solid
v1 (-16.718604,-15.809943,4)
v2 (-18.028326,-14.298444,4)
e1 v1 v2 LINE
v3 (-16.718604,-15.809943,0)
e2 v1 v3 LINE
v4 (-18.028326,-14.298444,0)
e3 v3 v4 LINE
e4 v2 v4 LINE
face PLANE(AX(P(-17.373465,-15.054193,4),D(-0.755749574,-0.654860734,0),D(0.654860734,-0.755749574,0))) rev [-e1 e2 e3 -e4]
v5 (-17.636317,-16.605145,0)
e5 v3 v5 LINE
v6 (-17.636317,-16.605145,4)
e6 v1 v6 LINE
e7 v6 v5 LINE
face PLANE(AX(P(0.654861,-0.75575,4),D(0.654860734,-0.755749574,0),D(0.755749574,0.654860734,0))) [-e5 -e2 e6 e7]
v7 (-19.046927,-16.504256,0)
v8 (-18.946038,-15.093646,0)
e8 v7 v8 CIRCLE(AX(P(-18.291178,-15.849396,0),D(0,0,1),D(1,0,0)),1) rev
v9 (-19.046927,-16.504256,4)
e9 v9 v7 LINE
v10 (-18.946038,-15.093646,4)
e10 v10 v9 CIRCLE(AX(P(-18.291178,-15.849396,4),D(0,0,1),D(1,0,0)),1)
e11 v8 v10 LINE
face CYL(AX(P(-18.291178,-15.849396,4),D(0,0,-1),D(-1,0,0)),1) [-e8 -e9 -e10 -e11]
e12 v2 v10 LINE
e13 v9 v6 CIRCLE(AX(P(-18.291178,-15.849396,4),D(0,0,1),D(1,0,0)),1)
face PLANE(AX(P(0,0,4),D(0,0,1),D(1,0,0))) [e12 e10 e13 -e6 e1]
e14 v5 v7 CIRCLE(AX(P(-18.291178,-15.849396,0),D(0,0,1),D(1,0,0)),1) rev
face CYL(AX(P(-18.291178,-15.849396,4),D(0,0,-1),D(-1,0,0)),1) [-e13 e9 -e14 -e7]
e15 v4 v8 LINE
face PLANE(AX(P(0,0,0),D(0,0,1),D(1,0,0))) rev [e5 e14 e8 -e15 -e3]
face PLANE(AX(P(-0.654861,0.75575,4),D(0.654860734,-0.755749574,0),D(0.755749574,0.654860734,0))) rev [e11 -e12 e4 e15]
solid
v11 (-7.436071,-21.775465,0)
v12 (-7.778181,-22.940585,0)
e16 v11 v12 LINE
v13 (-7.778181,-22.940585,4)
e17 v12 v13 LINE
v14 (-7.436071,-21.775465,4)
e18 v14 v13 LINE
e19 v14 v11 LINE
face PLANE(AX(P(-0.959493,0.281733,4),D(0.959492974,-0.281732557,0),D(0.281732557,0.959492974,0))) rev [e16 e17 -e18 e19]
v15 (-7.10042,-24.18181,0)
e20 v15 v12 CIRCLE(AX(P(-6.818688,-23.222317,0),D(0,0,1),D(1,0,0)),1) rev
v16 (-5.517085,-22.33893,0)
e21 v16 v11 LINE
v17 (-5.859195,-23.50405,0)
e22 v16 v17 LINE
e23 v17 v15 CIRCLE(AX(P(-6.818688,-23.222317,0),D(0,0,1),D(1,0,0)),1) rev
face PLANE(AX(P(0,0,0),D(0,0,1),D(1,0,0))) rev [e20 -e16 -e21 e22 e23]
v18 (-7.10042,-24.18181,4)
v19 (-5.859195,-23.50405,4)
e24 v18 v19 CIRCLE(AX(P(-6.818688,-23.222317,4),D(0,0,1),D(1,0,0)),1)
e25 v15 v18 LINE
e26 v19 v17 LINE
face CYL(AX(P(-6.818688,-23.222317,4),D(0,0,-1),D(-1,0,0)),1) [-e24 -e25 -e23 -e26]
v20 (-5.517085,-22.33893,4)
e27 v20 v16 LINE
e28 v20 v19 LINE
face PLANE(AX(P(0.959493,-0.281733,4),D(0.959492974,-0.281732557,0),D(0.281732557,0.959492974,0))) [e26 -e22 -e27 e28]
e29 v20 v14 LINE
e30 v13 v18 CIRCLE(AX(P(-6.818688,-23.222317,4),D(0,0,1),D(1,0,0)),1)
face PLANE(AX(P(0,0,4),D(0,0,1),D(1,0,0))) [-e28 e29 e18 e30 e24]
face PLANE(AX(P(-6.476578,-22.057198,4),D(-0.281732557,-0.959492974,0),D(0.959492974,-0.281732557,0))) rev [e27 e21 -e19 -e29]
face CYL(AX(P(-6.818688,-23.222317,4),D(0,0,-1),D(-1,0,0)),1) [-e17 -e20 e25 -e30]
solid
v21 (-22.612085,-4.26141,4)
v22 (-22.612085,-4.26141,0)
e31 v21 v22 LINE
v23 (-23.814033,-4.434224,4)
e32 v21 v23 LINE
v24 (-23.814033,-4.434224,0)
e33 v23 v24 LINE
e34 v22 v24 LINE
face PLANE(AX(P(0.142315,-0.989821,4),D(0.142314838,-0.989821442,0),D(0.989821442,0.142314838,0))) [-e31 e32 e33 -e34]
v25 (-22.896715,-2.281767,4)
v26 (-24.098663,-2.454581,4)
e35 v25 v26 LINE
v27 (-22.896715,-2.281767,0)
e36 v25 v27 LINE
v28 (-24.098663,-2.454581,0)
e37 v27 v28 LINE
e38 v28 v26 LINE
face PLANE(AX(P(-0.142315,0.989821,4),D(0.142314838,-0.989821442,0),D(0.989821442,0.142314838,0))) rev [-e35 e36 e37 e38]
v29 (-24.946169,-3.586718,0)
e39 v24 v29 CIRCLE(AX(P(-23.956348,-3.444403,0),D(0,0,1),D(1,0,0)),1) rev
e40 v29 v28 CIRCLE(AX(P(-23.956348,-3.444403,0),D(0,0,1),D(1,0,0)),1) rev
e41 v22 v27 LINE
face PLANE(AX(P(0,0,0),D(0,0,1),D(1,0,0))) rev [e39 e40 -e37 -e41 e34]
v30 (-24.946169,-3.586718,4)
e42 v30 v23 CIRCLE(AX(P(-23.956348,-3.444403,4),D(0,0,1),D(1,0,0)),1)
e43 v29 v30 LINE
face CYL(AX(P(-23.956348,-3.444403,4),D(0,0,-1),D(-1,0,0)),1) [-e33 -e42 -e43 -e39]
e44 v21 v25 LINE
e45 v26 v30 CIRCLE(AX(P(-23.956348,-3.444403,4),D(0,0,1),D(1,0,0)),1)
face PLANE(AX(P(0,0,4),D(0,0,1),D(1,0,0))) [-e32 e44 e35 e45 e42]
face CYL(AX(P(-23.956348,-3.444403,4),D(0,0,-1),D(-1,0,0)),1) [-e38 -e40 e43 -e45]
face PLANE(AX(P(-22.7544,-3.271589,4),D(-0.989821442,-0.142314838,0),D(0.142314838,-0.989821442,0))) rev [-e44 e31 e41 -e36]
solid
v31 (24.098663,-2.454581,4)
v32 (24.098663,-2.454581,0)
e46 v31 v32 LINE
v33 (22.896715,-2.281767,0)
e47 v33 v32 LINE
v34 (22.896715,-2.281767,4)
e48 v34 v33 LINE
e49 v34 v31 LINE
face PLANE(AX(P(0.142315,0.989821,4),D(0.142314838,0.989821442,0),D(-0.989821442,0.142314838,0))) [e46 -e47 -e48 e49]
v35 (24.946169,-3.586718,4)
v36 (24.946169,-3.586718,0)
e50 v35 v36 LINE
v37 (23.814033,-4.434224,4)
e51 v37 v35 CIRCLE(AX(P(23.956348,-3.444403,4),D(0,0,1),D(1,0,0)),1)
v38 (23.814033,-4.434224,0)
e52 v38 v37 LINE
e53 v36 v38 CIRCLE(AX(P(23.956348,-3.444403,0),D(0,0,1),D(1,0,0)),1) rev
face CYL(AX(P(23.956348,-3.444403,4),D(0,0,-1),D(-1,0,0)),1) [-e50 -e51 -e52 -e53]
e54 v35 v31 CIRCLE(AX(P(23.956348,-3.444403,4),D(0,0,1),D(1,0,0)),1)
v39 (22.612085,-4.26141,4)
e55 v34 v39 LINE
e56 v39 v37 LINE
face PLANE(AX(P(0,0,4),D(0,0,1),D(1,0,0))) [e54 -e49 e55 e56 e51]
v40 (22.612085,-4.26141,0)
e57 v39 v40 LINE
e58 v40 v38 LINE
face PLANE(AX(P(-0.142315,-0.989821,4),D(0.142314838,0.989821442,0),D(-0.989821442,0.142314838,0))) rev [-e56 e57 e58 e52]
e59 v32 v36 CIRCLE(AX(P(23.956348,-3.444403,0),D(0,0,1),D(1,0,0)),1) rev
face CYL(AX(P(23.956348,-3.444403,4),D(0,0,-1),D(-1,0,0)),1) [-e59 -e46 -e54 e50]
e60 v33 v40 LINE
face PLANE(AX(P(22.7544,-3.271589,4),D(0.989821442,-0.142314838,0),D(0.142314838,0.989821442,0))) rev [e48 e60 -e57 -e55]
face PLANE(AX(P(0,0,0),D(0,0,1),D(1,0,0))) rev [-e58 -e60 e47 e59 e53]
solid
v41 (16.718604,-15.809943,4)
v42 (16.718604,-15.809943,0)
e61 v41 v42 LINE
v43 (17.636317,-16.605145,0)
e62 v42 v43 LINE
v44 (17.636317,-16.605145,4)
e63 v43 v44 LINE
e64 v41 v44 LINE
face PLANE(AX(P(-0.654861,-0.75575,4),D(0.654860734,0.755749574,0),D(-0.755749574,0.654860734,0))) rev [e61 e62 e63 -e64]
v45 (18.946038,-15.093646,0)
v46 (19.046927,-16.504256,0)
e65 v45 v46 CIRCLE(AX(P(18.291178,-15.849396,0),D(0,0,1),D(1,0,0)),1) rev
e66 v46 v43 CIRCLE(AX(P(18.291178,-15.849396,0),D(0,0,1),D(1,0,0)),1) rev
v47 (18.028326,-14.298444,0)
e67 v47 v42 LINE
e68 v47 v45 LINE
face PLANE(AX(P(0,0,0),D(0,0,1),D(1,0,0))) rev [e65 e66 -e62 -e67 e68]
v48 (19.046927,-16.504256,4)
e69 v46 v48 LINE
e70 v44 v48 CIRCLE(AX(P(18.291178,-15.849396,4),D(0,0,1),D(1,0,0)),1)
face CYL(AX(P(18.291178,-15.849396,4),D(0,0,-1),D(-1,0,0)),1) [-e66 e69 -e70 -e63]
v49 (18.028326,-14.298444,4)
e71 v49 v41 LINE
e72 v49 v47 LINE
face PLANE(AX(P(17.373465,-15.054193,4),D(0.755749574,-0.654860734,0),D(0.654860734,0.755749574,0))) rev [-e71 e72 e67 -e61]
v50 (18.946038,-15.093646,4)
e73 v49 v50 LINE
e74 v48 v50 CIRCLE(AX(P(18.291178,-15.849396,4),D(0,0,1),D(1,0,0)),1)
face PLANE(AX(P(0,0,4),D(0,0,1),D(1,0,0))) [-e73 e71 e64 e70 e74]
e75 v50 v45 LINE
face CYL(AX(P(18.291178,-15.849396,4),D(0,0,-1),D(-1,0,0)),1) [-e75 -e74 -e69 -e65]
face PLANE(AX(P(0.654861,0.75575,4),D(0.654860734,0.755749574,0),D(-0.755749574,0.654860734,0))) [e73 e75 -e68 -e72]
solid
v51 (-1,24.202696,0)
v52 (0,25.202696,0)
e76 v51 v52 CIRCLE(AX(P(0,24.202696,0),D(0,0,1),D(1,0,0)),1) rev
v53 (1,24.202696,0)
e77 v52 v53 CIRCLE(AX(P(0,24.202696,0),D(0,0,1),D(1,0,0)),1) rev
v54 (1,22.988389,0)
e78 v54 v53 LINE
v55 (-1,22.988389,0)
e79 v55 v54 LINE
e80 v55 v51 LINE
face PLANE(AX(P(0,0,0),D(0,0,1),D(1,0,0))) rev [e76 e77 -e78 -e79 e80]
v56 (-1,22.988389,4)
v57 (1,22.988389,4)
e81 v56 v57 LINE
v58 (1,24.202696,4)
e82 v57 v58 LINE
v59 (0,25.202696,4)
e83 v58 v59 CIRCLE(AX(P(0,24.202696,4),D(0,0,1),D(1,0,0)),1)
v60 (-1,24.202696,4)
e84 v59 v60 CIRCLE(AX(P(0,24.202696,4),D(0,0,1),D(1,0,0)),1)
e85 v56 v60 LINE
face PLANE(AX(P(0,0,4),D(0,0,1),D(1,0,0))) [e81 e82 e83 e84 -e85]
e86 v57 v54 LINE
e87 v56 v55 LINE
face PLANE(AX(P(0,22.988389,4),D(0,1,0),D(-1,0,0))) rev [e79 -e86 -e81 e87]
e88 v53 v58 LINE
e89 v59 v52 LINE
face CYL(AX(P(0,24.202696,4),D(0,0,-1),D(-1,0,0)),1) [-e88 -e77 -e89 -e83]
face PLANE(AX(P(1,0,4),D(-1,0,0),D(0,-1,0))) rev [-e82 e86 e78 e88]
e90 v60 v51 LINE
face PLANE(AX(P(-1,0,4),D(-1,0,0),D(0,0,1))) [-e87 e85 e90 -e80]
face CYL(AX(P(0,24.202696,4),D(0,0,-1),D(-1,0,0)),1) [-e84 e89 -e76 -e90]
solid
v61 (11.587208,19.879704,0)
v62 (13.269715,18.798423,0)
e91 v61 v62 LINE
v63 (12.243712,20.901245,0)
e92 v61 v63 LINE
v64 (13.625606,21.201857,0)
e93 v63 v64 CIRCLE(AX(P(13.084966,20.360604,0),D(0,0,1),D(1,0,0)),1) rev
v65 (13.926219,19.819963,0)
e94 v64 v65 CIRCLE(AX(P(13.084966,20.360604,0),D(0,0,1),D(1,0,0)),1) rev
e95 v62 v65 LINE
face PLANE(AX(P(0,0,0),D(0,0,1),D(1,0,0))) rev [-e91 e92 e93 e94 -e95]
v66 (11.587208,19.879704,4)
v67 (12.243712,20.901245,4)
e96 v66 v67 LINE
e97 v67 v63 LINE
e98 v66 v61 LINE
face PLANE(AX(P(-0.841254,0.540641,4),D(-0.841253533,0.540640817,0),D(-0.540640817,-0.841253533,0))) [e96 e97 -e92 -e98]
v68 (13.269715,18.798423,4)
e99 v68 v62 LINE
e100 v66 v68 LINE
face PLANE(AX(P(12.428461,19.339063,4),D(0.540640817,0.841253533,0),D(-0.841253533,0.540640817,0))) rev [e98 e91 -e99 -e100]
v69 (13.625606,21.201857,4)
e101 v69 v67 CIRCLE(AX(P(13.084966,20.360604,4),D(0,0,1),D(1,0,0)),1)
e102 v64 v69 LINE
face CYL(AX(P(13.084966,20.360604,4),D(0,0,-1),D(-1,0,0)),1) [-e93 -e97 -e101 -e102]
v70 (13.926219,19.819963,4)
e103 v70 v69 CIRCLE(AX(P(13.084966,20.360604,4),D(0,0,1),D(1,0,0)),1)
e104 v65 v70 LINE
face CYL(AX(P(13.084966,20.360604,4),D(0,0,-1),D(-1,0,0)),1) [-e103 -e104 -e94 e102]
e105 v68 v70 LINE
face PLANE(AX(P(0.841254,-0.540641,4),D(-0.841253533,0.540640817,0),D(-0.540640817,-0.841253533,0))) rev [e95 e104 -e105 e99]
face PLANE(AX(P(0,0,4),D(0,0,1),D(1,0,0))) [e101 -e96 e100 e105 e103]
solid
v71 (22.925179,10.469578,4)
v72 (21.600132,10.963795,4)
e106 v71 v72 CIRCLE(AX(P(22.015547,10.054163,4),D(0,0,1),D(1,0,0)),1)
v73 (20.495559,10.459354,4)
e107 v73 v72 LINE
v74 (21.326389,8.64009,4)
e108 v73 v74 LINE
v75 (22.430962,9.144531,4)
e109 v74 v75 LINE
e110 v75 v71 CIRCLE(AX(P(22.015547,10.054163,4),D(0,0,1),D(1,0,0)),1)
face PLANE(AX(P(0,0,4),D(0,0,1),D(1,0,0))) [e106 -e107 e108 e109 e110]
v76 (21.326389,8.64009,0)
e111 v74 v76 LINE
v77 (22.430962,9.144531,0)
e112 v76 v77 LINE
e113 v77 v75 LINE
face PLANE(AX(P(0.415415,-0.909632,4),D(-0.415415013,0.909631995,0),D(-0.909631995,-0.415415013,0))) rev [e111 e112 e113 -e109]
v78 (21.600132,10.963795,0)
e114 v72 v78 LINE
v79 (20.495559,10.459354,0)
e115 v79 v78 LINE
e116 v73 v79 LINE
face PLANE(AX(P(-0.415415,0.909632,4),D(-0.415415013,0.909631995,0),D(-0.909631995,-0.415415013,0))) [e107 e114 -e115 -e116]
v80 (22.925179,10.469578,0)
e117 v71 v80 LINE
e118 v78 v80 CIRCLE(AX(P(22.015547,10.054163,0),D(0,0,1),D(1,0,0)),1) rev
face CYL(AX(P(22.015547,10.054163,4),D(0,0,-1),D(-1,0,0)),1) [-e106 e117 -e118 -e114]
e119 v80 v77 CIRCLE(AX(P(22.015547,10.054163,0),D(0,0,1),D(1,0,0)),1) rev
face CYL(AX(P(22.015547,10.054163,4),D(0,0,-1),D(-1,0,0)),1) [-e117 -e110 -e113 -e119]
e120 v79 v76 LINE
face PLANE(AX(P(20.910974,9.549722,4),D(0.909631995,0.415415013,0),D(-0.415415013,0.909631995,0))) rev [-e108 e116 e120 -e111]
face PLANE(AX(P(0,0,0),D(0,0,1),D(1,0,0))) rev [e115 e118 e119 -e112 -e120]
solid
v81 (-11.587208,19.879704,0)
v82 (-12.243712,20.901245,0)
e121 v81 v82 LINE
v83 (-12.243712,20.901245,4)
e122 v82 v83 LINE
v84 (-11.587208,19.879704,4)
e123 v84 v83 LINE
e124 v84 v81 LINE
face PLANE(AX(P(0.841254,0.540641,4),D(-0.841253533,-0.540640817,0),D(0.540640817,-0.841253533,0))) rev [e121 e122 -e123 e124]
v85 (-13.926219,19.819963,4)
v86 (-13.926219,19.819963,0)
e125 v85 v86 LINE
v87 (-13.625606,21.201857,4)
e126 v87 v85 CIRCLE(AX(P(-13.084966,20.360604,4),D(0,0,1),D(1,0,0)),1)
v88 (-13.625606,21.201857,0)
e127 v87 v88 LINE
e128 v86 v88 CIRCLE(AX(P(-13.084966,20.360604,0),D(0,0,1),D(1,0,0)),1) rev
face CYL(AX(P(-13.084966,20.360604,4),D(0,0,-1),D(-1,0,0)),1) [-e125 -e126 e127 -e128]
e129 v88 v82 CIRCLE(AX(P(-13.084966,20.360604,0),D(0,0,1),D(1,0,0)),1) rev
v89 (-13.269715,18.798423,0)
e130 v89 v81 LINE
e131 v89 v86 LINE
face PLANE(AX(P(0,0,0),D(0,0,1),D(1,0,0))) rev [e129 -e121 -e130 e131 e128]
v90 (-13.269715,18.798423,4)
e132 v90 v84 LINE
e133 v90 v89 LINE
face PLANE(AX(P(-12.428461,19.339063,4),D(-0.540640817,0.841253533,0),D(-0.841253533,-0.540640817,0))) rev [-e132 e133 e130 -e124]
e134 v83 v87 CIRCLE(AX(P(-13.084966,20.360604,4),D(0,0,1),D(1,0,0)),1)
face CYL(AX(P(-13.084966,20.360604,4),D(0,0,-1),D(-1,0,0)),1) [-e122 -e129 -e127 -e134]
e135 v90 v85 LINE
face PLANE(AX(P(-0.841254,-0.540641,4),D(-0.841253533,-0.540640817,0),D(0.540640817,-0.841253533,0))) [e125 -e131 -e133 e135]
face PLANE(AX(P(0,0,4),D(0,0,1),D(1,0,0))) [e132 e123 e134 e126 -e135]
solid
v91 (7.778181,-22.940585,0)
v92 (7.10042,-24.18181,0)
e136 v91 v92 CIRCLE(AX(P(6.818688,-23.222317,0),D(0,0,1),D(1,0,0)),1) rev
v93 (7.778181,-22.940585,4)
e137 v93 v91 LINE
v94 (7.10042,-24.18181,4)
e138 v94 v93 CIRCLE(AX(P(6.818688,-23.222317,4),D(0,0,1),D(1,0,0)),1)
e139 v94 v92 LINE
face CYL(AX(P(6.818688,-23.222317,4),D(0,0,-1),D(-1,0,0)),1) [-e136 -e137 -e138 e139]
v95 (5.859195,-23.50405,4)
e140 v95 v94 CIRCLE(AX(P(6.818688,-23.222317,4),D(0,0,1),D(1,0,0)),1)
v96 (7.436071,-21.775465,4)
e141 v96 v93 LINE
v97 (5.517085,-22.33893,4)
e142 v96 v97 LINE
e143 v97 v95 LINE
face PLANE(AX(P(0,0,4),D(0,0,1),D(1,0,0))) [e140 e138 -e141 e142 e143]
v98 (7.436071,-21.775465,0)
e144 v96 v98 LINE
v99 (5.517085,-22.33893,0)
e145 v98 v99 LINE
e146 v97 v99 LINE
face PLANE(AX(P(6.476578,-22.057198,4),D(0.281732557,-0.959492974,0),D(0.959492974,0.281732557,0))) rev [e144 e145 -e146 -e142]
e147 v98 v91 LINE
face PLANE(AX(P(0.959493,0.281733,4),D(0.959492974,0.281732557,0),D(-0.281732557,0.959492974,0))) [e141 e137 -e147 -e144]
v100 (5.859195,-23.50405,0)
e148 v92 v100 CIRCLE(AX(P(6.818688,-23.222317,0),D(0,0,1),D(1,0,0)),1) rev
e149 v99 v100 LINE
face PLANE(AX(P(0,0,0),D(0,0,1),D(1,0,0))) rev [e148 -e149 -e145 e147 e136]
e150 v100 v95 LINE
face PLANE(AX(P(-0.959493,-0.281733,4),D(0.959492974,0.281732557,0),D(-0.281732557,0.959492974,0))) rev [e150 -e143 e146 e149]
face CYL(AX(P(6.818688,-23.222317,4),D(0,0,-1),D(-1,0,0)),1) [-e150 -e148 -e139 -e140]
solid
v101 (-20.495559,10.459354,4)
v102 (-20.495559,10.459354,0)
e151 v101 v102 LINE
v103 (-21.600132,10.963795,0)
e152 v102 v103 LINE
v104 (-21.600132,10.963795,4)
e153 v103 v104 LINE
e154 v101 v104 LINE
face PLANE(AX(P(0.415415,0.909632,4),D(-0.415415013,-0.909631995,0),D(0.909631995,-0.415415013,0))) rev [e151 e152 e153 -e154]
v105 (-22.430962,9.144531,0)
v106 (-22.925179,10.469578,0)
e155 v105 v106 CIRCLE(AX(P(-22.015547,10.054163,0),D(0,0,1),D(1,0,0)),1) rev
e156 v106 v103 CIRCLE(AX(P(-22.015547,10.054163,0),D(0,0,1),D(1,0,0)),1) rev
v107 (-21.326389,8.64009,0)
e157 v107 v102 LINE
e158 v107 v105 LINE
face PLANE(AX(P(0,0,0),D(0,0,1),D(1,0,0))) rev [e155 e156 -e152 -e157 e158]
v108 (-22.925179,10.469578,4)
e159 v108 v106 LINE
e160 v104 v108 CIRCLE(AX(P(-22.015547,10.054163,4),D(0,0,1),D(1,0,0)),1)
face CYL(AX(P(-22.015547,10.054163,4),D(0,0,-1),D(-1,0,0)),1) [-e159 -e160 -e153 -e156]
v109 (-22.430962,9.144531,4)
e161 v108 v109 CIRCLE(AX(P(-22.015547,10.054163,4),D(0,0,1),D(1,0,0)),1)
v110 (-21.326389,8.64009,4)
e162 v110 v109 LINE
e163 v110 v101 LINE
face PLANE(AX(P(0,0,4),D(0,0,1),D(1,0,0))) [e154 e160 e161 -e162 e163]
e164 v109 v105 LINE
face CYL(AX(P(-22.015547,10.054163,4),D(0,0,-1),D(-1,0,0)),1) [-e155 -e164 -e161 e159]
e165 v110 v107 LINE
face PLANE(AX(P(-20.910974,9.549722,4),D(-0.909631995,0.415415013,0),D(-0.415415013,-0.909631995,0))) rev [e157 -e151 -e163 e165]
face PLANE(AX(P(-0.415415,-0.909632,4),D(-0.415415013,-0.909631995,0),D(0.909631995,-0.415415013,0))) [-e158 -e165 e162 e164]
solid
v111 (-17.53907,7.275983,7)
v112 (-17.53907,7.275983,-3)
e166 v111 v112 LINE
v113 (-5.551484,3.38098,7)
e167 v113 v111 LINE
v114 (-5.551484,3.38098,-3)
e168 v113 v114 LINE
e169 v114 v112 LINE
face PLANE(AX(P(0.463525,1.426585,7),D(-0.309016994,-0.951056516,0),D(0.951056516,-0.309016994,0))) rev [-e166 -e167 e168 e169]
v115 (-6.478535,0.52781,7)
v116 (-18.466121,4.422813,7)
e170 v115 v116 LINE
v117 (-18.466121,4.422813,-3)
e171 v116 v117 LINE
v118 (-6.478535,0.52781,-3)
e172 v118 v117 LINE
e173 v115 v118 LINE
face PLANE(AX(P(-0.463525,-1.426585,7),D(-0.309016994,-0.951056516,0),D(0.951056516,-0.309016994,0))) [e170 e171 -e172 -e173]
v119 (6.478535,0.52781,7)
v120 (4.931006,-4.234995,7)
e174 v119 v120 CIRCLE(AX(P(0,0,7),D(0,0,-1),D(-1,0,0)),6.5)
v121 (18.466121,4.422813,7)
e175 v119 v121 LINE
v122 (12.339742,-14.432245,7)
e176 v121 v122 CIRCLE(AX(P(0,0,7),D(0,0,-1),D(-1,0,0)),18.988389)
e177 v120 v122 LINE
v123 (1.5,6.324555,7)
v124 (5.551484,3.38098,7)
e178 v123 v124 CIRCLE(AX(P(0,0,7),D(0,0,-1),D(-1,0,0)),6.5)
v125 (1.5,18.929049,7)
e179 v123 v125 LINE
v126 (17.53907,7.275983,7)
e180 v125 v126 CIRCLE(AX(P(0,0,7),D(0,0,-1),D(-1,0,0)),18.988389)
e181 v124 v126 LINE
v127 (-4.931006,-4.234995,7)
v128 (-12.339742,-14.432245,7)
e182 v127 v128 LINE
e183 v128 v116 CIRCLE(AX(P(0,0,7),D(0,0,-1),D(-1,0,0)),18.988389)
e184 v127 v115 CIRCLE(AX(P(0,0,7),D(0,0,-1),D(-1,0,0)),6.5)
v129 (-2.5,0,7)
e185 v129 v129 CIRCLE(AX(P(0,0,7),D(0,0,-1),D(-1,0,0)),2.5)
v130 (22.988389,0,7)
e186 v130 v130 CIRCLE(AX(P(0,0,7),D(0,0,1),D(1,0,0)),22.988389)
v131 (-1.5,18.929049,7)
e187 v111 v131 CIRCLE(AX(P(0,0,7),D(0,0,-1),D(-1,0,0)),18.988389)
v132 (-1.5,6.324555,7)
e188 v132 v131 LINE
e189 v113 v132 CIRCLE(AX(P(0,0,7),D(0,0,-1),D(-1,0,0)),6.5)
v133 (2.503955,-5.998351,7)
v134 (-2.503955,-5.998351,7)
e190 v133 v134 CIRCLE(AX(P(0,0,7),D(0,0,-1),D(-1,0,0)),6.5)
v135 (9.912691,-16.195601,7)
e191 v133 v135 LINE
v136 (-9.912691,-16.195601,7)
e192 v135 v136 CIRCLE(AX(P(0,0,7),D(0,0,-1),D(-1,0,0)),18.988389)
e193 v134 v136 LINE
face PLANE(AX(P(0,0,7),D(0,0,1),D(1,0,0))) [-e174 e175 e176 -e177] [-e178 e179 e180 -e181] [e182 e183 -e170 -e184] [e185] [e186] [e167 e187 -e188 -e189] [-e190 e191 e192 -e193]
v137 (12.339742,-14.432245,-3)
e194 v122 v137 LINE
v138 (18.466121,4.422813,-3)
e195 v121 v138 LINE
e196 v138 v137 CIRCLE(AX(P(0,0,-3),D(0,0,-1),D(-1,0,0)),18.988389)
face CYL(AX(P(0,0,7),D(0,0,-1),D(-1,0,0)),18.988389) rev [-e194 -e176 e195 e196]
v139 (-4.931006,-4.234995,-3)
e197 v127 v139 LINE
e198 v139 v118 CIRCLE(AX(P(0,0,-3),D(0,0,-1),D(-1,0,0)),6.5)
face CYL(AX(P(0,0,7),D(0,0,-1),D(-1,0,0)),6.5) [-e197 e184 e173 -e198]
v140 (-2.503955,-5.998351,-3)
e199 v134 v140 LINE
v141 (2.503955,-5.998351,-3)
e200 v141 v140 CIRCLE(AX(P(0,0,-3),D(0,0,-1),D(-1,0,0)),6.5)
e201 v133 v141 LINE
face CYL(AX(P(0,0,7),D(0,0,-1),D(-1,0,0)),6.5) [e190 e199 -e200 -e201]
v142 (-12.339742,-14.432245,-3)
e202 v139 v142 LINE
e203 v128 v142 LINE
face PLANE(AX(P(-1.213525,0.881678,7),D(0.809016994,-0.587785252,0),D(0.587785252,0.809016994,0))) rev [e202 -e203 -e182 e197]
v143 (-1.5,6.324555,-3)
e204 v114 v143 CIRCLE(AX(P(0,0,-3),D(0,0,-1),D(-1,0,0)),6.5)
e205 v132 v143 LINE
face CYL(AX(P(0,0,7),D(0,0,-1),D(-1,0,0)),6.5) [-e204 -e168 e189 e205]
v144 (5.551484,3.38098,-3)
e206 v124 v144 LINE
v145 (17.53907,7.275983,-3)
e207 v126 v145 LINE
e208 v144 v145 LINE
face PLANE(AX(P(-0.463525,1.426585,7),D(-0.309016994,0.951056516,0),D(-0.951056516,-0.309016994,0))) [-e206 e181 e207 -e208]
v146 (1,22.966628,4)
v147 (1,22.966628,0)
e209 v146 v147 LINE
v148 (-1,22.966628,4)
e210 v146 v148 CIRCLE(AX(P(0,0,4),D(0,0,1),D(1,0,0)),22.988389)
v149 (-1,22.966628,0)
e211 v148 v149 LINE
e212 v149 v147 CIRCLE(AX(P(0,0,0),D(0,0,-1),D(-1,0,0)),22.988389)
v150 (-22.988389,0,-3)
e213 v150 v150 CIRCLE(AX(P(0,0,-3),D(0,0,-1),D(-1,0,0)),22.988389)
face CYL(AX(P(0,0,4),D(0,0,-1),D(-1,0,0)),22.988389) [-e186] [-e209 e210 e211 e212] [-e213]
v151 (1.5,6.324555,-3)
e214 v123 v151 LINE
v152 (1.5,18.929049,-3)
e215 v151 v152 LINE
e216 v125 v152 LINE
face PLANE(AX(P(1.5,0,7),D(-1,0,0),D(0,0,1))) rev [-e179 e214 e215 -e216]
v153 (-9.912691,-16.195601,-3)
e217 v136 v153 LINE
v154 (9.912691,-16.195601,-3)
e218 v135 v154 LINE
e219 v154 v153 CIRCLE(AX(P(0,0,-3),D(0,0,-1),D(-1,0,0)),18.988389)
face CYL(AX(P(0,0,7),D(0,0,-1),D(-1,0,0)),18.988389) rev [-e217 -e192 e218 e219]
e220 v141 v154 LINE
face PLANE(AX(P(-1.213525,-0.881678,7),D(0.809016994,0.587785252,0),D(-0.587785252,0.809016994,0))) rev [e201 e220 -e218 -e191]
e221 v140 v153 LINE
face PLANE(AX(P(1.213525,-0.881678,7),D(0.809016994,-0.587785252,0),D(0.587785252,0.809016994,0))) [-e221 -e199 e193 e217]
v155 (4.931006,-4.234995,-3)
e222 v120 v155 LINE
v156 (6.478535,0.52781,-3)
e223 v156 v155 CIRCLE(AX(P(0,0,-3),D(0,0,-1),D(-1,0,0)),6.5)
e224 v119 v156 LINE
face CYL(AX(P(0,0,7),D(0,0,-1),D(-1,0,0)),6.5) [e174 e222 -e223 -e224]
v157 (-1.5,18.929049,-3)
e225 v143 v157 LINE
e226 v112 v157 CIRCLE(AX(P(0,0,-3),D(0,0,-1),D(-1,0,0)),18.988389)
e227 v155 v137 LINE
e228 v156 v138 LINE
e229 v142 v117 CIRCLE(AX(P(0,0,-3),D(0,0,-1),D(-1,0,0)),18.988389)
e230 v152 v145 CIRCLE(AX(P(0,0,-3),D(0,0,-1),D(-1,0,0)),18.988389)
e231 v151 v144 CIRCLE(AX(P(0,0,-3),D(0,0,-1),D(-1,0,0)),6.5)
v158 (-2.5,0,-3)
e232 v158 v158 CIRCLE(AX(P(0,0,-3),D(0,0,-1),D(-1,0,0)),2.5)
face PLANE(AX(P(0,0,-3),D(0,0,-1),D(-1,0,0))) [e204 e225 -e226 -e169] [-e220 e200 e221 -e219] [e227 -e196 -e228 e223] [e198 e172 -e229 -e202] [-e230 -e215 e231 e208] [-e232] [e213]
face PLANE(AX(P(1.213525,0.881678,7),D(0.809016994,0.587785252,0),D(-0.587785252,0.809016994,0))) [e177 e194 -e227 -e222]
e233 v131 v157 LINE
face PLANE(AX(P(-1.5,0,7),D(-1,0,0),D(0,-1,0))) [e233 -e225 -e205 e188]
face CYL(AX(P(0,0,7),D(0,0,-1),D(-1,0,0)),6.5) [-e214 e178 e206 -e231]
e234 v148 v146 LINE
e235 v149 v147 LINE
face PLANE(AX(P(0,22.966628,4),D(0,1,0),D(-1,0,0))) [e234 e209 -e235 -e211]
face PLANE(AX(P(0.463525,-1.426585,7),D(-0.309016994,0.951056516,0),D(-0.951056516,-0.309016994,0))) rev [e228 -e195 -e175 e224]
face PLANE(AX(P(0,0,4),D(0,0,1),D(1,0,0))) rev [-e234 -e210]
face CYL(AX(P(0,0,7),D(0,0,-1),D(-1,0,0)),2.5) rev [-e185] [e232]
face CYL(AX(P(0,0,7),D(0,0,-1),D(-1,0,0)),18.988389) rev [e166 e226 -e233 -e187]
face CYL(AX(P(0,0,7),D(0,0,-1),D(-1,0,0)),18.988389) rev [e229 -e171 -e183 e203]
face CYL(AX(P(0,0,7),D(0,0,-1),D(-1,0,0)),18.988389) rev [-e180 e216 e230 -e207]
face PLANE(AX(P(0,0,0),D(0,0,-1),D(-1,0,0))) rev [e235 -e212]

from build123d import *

# Parameters (mm, degrees)
BOSS_EXTRUDE1_DEPTH    = 4
BOSS_EXTRUDE1_2_DEPTH  = 4
BOSS_EXTRUDE1_3_DEPTH  = 4
BOSS_EXTRUDE1_4_DEPTH  = 4
BOSS_EXTRUDE1_5_DEPTH  = 4
BOSS_EXTRUDE1_6_DEPTH  = 4
BOSS_EXTRUDE1_7_DEPTH  = 4
BOSS_EXTRUDE1_8_DEPTH  = 4
BOSS_EXTRUDE1_9_DEPTH  = 4
BOSS_EXTRUDE1_10_DEPTH = 4
BOSS_EXTRUDE1_11_DEPTH = 4
BOSS_EXTRUDE1_12_DEPTH = 4
SKETCH5_R              = 22.988388863
BOSS_EXTRUDE3_DEPTH    = 3
SKETCH6_R              = 22.988388863
BOSS_EXTRUDE4_DEPTH    = 3
SKETCH7_R              = 2.5
CUT_EXTRUDE1_DEPTH     = 10
CUT_EXTRUDE2_DEPTH     = 10
FILLET1_R              = 1
FILLET2_R              = 1
FILLET3_R              = 1
FILLET4_R              = 1
FILLET5_R              = 1
FILLET6_R              = 1
FILLET7_R              = 1
FILLET8_R              = 1
FILLET9_R              = 1
FILLET10_R             = 1
FILLET11_R             = 1


with BuildPart() as part:
    # Sketch2 → Boss-Extrude1 (new body)
    with BuildSketch(Plane.XY):
        with BuildLine():
            Line((-1, 24.966628453), (-1, 22.988388863))
            Line((-1, 22.988388863), (1, 22.988388863))
            Line((1, 22.988388863), (1, 24.966628453))
            ThreePointArc((1, 24.966628453), (0, 25.20269643), (-1, 24.966628453))
        make_face()
    extrude(amount=BOSS_EXTRUDE1_DEPTH)

    # Fillet1
    fillet1_edges = [part.edges().sort_by_distance(p)[0] for p in [
        (-1, 24.966628453, 2),
        (1, 24.966628453, 2),
    ]]
    fillet(fillet1_edges, radius=FILLET1_R - 0.0001)  # a hair under: the kernel refuses the full size


with BuildPart() as body_2:
    # Sketch2 → Boss-Extrude1 2 (new body)
    with BuildSketch(Plane.XY):
        with BuildLine():
            Line((-13.269714879, 18.798422527), (-12.428461559, 19.339063208))
            Line((-12.428461559, 19.339063208), (-11.587207814, 19.879704162))
            Line((-11.587207814, 19.879704162), (-12.656724883, 21.543905206))
            ThreePointArc((-12.656724883, 21.543905206), (-13.6256064, 21.201857409), (-14.339231949, 20.462623571))
            Line((-14.339231949, 20.462623571), (-13.269714879, 18.798422527))
        make_face()
    extrude(amount=BOSS_EXTRUDE1_2_DEPTH)

    # Fillet2
    fillet2_edges = [body_2.edges().sort_by_distance(p)[0] for p in [
        (-14.339231949, 20.462623571, 2),
        (-12.656724883, 21.543905206, 2),
    ]]
    fillet(fillet2_edges, radius=FILLET2_R - 0.0001)  # a hair under: the kernel refuses the full size


with BuildPart() as body_3:
    # Sketch2 → Boss-Extrude1 3 (new body)
    with BuildSketch(Plane.XY):
        with BuildLine():
            Line((1, 22.966628453), (-1, 22.966628453))
            ThreePointArc((-1, 22.966628453), (-6.954904914, 21.911077567), (-12.428461559, 19.339063208))
            ThreePointArc((-12.428461559, 19.339063208), (-17.373465046, 15.054193263), (-20.910973859, 9.549722234))
            ThreePointArc((-20.910973859, 9.549722234), (-22.754400197, 3.271588939), (-22.754400179, -3.271589061))
            ThreePointArc((-22.754400179, -3.271589061), (-20.91097412, -9.549721663), (-17.373465524, -15.054192711))
            ThreePointArc((-17.373465524, -15.054192711), (-12.428461917, -19.339062978), (-6.47657825, -22.057197389))
            ThreePointArc((-6.47657825, -22.057197389), (0, -22.988388863), (6.47657825, -22.057197389))
            ThreePointArc((6.47657825, -22.057197389), (12.42846186, -19.339063015), (17.373465435, -15.054192814))
            ThreePointArc((17.373465435, -15.054192814), (20.910974105, -9.549721696), (22.754400188, -3.271588999))
            ThreePointArc((22.754400188, -3.271588999), (22.754400262, 3.271588485), (20.910974266, 9.549721344))
            ThreePointArc((20.910974266, 9.549721344), (17.373465478, 15.054192764), (12.428461848, 19.339063022))
            ThreePointArc((12.428461848, 19.339063022), (6.954905078, 21.911077515), (1, 22.966628453))
        make_face()
    extrude(amount=BOSS_EXTRUDE1_3_DEPTH)

    # Sketch5 → Boss-Extrude3 (add)
    with BuildSketch(Plane.XY.offset(4)):
        with Locations(Location((0, 0, 0), (0, 0, 92.493165793))):
            Circle(SKETCH5_R)
    extrude(amount=BOSS_EXTRUDE3_DEPTH)

    # Sketch6 → Boss-Extrude4 (add)
    with BuildSketch(Plane(origin=(0, 0, 0), x_dir=(-1, 0, 0), z_dir=(0, 0, -1))):
        Circle(SKETCH6_R)
    extrude(amount=BOSS_EXTRUDE4_DEPTH)

    # Sketch7 → Cut-Extrude1 (cut)
    with BuildSketch(Plane(origin=(0, 0, -3), x_dir=(-1, 0, 0), z_dir=(0, 0, -1))):
        Circle(SKETCH7_R)
    extrude(amount=-CUT_EXTRUDE1_DEPTH, mode=Mode.SUBTRACT)

    # Sketch8 → Cut-Extrude2 (cut)
    with BuildSketch(Plane(origin=(0, 0, -3), x_dir=(-1, 0, 0), z_dir=(0, 0, -1))):
        with BuildLine():
            ThreePointArc((-5.551484059, 3.38097985), (-3.82060414, 5.258610463), (-1.5, 6.32455532))
            Line((-1.5, 6.32455532), (-1.5, 18.929049411))
            ThreePointArc((-1.5, 18.929049411), (-11.161094938, 15.361929286), (-17.539070298, 7.27598273))
            Line((-17.539070298, 7.27598273), (-5.551484059, 3.38097985))
        make_face()
        with BuildLine():
            Line((1.5, 18.929049411), (1.5, 6.32455532))
            ThreePointArc((1.5, 6.32455532), (3.82060414, 5.258610463), (5.551484059, 3.38097985))
            Line((5.551484059, 3.38097985), (17.539070298, 7.27598273))
            ThreePointArc((17.539070298, 7.27598273), (11.161094938, 15.361929286), (1.5, 18.929049411))
        make_face()
        with BuildLine():
            Line((18.466121281, 4.422813181), (6.478535042, 0.527810301))
            ThreePointArc((6.478535042, 0.527810301), (6.494631543, 0.264123294), (6.5, 0))
            ThreePointArc((6.5, 0), (6.095143064, -2.258147699), (4.931005836, -4.234994858))
            Line((4.931005836, -4.234994858), (12.339741575, -14.432244782))
            ThreePointArc((12.339741575, -14.432244782), (17.246314434, -7.945033043), (18.988388863, 0))
            ThreePointArc((18.988388863, 0), (18.857369955, 2.226771197), (18.466121281, 4.422813181))
        make_face()
        with BuildLine():
            ThreePointArc((2.503954853, -5.998350614), (0, -6.5), (-2.503954853, -5.998350614))
            Line((-2.503954853, -5.998350614), (-9.912690592, -16.195600539))
            ThreePointArc((-9.912690592, -16.195600539), (0, -18.988388863), (9.912690592, -16.195600539))
            Line((9.912690592, -16.195600539), (2.503954853, -5.998350614))
        make_face()
        with BuildLine():
            ThreePointArc((-4.931005836, -4.234994858), (-6.181867356, -2.008610463), (-6.478535042, 0.527810301))
            Line((-6.478535042, 0.527810301), (-18.466121281, 4.422813181))
            ThreePointArc((-18.466121281, 4.422813181), (-18.059030962, -5.867734854), (-12.339741575, -14.432244782))
            Line((-12.339741575, -14.432244782), (-4.931005836, -4.234994858))
        make_face()
    extrude(amount=-CUT_EXTRUDE2_DEPTH, mode=Mode.SUBTRACT)


with BuildPart() as body_4:
    # Sketch2 → Boss-Extrude1 4 (new body)
    with BuildSketch(Plane.XY):
        with BuildLine():
            Line((12.656724883, 21.543905206), (11.587207814, 19.879704162))
            Line((11.587207814, 19.879704162), (12.428461848, 19.339063022))
            Line((12.428461848, 19.339063022), (13.269714879, 18.798422527))
            Line((13.269714879, 18.798422527), (14.339231949, 20.462623571))
            ThreePointArc((14.339231949, 20.462623571), (13.6256064, 21.201857409), (12.656724883, 21.543905206))
        make_face()
    extrude(amount=BOSS_EXTRUDE1_4_DEPTH)

    # Fillet8
    fillet8_edges = [body_4.edges().sort_by_distance(p)[0] for p in [
        (14.339231949, 20.462623571, 2),
        (12.656724883, 21.543905206, 2),
    ]]
    fillet(fillet8_edges, radius=FILLET8_R - 0.0001)  # a hair under: the kernel refuses the full size


with BuildPart() as body_5:
    # Sketch2 → Boss-Extrude1 5 (new body)
    with BuildSketch(Plane.XY):
        with BuildLine():
            Line((-20.910973859, 9.549722234), (-20.495559018, 10.459353854))
            Line((-20.495559018, 10.459353854), (-22.295029044, 11.281144279))
            ThreePointArc((-22.295029044, 11.281144279), (-22.925179042, 10.469578465), (-23.12585907, 9.461880288))
            Line((-23.12585907, 9.461880288), (-21.326389044, 8.640089863))
            Line((-21.326389044, 8.640089863), (-20.910973859, 9.549722234))
        make_face()
    extrude(amount=BOSS_EXTRUDE1_5_DEPTH)

    # Fillet3
    fillet3_edges = [body_5.edges().sort_by_distance(p)[0] for p in [
        (-23.12585907, 9.461880288, 2),
        (-22.295029044, 11.281144279, 2),
    ]]
    fillet(fillet3_edges, radius=FILLET3_R - 0.0001)  # a hair under: the kernel refuses the full size


with BuildPart() as body_6:
    # Sketch2 → Boss-Extrude1 6 (new body)
    with BuildSketch(Plane.XY):
        with BuildLine():
            Line((22.295029044, 11.281144279), (20.495559018, 10.459353854))
            Line((20.495559018, 10.459353854), (20.910974266, 9.549721344))
            Line((20.910974266, 9.549721344), (21.326389044, 8.640089863))
            Line((21.326389044, 8.640089863), (23.12585907, 9.461880288))
            ThreePointArc((23.12585907, 9.461880288), (22.925179042, 10.469578465), (22.295029044, 11.281144279))
        make_face()
    extrude(amount=BOSS_EXTRUDE1_6_DEPTH)

    # Fillet9
    fillet9_edges = [body_6.edges().sort_by_distance(p)[0] for p in [
        (22.295029044, 11.281144279, 2),
        (23.12585907, 9.461880288, 2),
    ]]
    fillet(fillet9_edges, radius=FILLET9_R - 0.0001)  # a hair under: the kernel refuses the full size


with BuildPart() as body_7:
    # Sketch2 → Boss-Extrude1 7 (new body)
    with BuildSketch(Plane.XY):
        with BuildLine():
            Line((-22.754400179, -3.271589061), (-22.896715049, -2.281767401))
            Line((-22.896715049, -2.281767401), (-24.854819012, -2.563300249))
            ThreePointArc((-24.854819012, -2.563300249), (-24.94616932, -3.586717667), (-24.570189336, -4.542943132))
            Line((-24.570189336, -4.542943132), (-22.612085372, -4.261410285))
            Line((-22.612085372, -4.261410285), (-22.754400179, -3.271589061))
        make_face()
    extrude(amount=BOSS_EXTRUDE1_7_DEPTH)

    # Fillet4
    fillet4_edges = [body_7.edges().sort_by_distance(p)[0] for p in [
        (-24.854819012, -2.563300249, 2),
        (-24.570189336, -4.542943132, 2),
    ]]
    fillet(fillet4_edges, radius=FILLET4_R - 0.0001)  # a hair under: the kernel refuses the full size


with BuildPart() as body_8:
    # Sketch2 → Boss-Extrude1 8 (new body)
    with BuildSketch(Plane.XY):
        with BuildLine():
            Line((24.854819012, -2.563300249), (22.896715049, -2.281767401))
            Line((22.896715049, -2.281767401), (22.754400188, -3.271588999))
            Line((22.754400188, -3.271588999), (22.612085372, -4.261410285))
            Line((22.612085372, -4.261410285), (24.570189336, -4.542943132))
            ThreePointArc((24.570189336, -4.542943132), (24.94616932, -3.586717667), (24.854819012, -2.563300249))
        make_face()
    extrude(amount=BOSS_EXTRUDE1_8_DEPTH)

    # Fillet10
    fillet10_edges = [body_8.edges().sort_by_distance(p)[0] for p in [
        (24.854819012, -2.563300249, 2),
        (24.570189336, -4.542943132, 2),
    ]]
    fillet(fillet10_edges, radius=FILLET10_R - 0.0001)  # a hair under: the kernel refuses the full size


with BuildPart() as body_9:
    # Sketch2 → Boss-Extrude1 9 (new body)
    with BuildSketch(Plane.XY):
        with BuildLine():
            Line((-17.373465524, -15.054192711), (-18.028325832, -14.298443628))
            Line((-18.028325832, -14.298443628), (-19.52337956, -15.593915058))
            ThreePointArc((-19.52337956, -15.593915058), (-19.0469271, -16.504256282), (-18.213658092, -17.105414207))
            Line((-18.213658092, -17.105414207), (-16.718604364, -15.809942777))
            Line((-16.718604364, -15.809942777), (-17.373465524, -15.054192711))
        make_face()
    extrude(amount=BOSS_EXTRUDE1_9_DEPTH)

    # Fillet5
    fillet5_edges = [body_9.edges().sort_by_distance(p)[0] for p in [
        (-18.213658092, -17.105414207, 2),
        (-19.52337956, -15.593915058, 2),
    ]]
    fillet(fillet5_edges, radius=FILLET5_R - 0.0001)  # a hair under: the kernel refuses the full size


with BuildPart() as body_10:
    # Sketch2 → Boss-Extrude1 10 (new body)
    with BuildSketch(Plane.XY):
        with BuildLine():
            Line((-6.47657825, -22.057197389), (-7.436070546, -21.775465031))
            Line((-7.436070546, -21.775465031), (-7.993405043, -23.673572019))
            ThreePointArc((-7.993405043, -23.673572019), (-7.100420105, -24.181810141), (-6.074419096, -24.237037132))
            Line((-6.074419096, -24.237037132), (-5.517084598, -22.338930145))
            Line((-5.517084598, -22.338930145), (-6.47657825, -22.057197389))
        make_face()
    extrude(amount=BOSS_EXTRUDE1_10_DEPTH)

    # Fillet6
    fillet6_edges = [body_10.edges().sort_by_distance(p)[0] for p in [
        (-7.993405043, -23.673572019, 2),
        (-6.074419096, -24.237037132, 2),
    ]]
    fillet(fillet6_edges, radius=FILLET6_R - 0.0001)  # a hair under: the kernel refuses the full size


with BuildPart() as body_11:
    # Sketch2 → Boss-Extrude1 11 (new body)
    with BuildSketch(Plane.XY):
        with BuildLine():
            Line((19.52337956, -15.593915058), (18.028325832, -14.298443628))
            Line((18.028325832, -14.298443628), (17.373465435, -15.054192814))
            Line((17.373465435, -15.054192814), (16.718604364, -15.809942777))
            Line((16.718604364, -15.809942777), (18.213658092, -17.105414207))
            ThreePointArc((18.213658092, -17.105414207), (19.0469271, -16.504256282), (19.52337956, -15.593915058))
        make_face()
    extrude(amount=BOSS_EXTRUDE1_11_DEPTH)

    # Fillet11
    fillet11_edges = [body_11.edges().sort_by_distance(p)[0] for p in [
        (18.213658092, -17.105414207, 2),
        (19.52337956, -15.593915058, 2),
    ]]
    fillet(fillet11_edges, radius=FILLET11_R - 0.0001)  # a hair under: the kernel refuses the full size


with BuildPart() as body_12:
    # Sketch2 → Boss-Extrude1 12 (new body)
    with BuildSketch(Plane.XY):
        with BuildLine():
            Line((6.47657825, -22.057197389), (5.517084598, -22.338930145))
            Line((5.517084598, -22.338930145), (6.074419096, -24.237037132))
            ThreePointArc((6.074419096, -24.237037132), (7.100420105, -24.181810141), (7.993405043, -23.673572019))
            Line((7.993405043, -23.673572019), (7.436070546, -21.775465031))
            Line((7.436070546, -21.775465031), (6.47657825, -22.057197389))
        make_face()
    extrude(amount=BOSS_EXTRUDE1_12_DEPTH)

    # Fillet7
    fillet7_edges = [body_12.edges().sort_by_distance(p)[0] for p in [
        (7.993405043, -23.673572019, 2),
        (6.074419096, -24.237037132, 2),
    ]]
    fillet(fillet7_edges, radius=FILLET7_R - 0.0001)  # a hair under: the kernel refuses the full size


solid = Compound([part.part, body_2.part, body_3.part, body_4.part, body_5.part, body_6.part, body_7.part, body_8.part, body_9.part, body_10.part, body_11.part, body_12.part])
